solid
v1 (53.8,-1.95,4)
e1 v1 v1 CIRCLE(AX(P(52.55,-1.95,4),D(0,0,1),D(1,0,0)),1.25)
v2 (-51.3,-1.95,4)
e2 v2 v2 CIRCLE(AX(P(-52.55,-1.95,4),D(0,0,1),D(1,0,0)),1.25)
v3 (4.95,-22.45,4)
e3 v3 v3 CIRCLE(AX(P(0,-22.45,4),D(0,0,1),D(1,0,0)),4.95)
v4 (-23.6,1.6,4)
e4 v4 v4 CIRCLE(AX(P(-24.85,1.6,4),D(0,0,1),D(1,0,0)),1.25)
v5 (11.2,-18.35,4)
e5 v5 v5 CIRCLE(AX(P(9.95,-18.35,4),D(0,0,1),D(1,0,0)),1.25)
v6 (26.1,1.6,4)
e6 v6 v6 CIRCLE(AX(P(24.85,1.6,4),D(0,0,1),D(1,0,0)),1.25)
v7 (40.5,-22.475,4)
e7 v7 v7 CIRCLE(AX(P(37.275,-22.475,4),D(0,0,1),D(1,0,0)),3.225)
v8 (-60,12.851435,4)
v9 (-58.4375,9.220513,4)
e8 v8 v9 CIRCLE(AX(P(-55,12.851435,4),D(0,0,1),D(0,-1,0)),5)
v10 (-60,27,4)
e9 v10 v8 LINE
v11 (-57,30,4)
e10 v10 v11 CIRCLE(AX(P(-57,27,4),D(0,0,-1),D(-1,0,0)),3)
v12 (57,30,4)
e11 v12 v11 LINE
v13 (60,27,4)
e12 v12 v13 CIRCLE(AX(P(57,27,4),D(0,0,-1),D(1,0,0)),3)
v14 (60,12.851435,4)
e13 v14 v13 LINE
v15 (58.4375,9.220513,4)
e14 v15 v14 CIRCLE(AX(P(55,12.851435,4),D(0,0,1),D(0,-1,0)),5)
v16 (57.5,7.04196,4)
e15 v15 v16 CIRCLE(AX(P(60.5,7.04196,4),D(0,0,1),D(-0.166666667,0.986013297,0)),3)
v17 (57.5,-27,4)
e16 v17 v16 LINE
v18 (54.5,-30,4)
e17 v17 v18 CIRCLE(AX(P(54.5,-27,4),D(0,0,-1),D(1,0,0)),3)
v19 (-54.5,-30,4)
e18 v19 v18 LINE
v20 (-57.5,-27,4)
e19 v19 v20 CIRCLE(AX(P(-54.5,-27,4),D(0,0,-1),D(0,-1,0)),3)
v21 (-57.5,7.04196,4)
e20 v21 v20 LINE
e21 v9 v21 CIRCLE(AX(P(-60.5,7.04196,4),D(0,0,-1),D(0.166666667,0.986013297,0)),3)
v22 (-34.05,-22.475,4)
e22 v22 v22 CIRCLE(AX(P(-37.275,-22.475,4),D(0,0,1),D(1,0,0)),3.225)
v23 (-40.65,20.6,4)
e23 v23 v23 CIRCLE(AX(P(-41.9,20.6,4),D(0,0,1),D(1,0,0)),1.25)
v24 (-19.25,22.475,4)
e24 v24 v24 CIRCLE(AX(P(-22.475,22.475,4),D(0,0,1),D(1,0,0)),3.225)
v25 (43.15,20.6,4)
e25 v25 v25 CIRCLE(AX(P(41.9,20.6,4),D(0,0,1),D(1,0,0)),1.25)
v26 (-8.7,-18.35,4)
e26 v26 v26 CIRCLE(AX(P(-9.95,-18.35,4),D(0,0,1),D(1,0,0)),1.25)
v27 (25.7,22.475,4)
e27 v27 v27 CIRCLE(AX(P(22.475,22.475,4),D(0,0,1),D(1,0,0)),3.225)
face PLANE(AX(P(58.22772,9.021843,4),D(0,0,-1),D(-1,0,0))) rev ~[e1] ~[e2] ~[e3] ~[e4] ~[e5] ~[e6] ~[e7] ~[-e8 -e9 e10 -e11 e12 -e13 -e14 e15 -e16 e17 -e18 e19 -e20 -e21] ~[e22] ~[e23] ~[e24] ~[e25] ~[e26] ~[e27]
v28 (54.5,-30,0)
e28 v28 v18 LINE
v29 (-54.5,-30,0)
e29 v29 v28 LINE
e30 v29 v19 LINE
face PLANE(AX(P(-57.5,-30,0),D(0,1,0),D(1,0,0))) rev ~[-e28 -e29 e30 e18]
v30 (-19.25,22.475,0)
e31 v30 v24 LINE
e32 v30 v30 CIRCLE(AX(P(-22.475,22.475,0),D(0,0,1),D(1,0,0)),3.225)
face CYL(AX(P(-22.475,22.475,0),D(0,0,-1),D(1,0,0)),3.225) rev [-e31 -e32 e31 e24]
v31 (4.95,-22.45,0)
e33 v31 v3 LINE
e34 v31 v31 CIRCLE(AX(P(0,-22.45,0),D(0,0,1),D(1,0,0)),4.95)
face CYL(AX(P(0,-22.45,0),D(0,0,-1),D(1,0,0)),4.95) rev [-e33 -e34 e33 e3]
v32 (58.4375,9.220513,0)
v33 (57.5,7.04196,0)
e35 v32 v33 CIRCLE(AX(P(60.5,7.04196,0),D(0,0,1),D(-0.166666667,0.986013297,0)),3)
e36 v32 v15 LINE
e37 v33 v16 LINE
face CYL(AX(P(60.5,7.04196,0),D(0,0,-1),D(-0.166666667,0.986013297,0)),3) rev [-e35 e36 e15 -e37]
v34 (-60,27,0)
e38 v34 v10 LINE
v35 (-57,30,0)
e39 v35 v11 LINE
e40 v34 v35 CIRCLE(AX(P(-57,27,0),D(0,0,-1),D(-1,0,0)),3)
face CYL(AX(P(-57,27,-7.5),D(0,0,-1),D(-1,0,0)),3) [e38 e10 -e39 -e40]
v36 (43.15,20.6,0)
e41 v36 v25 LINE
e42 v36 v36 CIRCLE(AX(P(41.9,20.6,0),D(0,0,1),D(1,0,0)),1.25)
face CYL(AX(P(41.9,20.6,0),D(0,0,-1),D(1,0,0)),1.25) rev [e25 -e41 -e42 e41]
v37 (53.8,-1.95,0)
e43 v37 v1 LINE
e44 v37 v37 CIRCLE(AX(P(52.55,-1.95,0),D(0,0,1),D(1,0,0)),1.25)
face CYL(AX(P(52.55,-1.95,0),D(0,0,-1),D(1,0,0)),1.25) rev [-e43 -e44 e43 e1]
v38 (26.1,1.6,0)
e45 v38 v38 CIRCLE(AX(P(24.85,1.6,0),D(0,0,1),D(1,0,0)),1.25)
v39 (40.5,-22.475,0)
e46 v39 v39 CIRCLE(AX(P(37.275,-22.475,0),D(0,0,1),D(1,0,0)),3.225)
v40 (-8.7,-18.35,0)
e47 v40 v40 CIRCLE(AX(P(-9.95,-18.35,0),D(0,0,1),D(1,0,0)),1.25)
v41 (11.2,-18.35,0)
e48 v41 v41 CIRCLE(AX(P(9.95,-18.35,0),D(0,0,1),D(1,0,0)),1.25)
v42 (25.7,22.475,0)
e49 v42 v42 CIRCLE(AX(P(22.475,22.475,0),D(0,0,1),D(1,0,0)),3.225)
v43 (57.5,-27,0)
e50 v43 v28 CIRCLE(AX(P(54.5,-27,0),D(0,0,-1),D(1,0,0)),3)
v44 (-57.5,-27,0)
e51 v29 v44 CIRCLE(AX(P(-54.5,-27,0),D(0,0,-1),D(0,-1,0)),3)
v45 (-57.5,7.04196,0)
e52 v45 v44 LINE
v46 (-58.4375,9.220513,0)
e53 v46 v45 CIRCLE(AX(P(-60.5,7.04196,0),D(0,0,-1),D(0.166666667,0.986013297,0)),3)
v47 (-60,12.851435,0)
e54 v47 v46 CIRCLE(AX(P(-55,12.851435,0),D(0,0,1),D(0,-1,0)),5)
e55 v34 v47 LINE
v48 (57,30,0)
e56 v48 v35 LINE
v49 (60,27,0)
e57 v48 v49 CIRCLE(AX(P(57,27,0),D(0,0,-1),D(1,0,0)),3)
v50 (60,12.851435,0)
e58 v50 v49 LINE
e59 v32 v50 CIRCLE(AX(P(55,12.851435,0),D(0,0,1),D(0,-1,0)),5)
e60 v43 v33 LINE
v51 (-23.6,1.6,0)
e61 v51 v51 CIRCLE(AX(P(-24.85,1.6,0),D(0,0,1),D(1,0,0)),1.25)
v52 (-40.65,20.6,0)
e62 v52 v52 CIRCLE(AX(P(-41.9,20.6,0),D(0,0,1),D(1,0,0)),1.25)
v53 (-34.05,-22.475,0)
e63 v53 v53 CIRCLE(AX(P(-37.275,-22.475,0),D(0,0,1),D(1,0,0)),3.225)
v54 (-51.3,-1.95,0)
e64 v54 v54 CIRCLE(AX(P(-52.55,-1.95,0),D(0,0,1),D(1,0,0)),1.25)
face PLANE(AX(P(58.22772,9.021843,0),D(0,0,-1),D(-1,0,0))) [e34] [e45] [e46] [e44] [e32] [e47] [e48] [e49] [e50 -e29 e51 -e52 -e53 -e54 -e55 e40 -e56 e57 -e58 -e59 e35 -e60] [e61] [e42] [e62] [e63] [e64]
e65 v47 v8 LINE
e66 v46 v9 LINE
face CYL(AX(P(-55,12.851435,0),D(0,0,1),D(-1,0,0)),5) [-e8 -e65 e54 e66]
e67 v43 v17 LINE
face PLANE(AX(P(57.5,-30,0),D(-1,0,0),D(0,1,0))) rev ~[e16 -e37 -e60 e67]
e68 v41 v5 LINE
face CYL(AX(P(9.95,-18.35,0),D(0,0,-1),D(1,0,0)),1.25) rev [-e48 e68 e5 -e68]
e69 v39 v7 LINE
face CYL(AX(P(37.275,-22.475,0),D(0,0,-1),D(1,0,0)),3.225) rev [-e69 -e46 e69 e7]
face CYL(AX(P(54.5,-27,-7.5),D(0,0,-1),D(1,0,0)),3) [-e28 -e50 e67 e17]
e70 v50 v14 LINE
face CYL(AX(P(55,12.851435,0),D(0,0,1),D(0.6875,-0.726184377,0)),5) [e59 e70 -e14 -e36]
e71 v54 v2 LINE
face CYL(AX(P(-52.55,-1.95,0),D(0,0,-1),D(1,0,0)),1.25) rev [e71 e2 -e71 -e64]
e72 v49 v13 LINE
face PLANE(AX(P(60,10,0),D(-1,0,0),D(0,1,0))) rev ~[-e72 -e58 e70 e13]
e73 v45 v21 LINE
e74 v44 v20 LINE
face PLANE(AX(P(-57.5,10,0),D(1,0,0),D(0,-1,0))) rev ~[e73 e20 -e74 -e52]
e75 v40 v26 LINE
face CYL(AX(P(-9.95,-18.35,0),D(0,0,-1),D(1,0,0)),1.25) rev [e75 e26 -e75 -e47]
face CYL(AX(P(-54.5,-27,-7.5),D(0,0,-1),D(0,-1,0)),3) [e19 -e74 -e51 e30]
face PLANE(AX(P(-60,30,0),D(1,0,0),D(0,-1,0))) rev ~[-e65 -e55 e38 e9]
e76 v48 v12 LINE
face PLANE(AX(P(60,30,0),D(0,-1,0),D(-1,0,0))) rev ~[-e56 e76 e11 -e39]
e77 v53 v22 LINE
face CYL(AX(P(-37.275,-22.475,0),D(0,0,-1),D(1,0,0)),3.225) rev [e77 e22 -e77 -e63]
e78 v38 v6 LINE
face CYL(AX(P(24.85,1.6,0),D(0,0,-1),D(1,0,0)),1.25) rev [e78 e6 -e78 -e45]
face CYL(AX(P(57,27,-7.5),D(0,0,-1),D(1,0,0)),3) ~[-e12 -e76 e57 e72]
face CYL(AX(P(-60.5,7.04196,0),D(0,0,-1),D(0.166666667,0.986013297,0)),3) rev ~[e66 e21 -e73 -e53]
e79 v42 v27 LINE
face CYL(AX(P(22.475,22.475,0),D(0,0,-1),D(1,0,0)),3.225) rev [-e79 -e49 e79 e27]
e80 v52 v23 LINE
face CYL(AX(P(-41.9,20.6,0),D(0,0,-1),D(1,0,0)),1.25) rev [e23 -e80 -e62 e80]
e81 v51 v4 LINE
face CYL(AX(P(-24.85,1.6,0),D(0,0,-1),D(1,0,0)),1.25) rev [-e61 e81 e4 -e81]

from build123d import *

# Parameters (mm, degrees)
F0_R         = 3.225
F0_R_2       = 1.25
F0_R_3       = 4.95
F1_DEPTH     = 4
F2_T1_DEPTH  = 4
F2_T3_DEPTH  = 4
F2_T5_DEPTH  = 19
F2_T7_DEPTH  = 19
F2_T9_DEPTH  = 19
F2_T11_DEPTH = 19
F3_R         = 5


# Not quite as in the source:
# - a fillet or chamfer that OpenCascade refuses, or shapes differently, is made with other operations: its cross-section is extruded or revolved along the edge and cut away or added


with BuildPart() as f1:
    # F0 (on Top) → F1 (new body)
    with BuildSketch(Plane.XY):
        Polygon((60, 10), (60, 30), (-60, 30), (-60, 10), (-57.5, 10), (-57.5, -30), (57.5, -30), (57.5, 10), align=None)
        with Locations((-37.275, -22.475)):
            Circle(F0_R, mode=Mode.SUBTRACT)
        with Locations((-9.95, -18.35)):
            Circle(F0_R_2, mode=Mode.SUBTRACT)
        with Locations((-52.55, -1.95)):
            Circle(F0_R_2, mode=Mode.SUBTRACT)
        with Locations((0, -22.45)):
            Circle(F0_R_3, mode=Mode.SUBTRACT)
        with Locations((9.95, -18.35)):
            Circle(F0_R_2, mode=Mode.SUBTRACT)
        with Locations((37.275, -22.475)):
            Circle(F0_R, mode=Mode.SUBTRACT)
        with Locations((52.55, -1.95)):
            Circle(F0_R_2, mode=Mode.SUBTRACT)
        with Locations((-24.85, 1.6)):
            Circle(F0_R_2, mode=Mode.SUBTRACT)
        with Locations((-41.9, 20.6)):
            Circle(F0_R_2, mode=Mode.SUBTRACT)
        with Locations((-22.475, 22.475)):
            Circle(F0_R, mode=Mode.SUBTRACT)
        with Locations((24.85, 1.6)):
            Circle(F0_R_2, mode=Mode.SUBTRACT)
        with Locations((22.475, 22.475)):
            Circle(F0_R, mode=Mode.SUBTRACT)
        with Locations((41.9, 20.6)):
            Circle(F0_R_2, mode=Mode.SUBTRACT)
    extrude(amount=F1_DEPTH)

    # F2: fillet of radius 3 on 6 edges, made by hand

    # F2_s2 → F2_t1 (join)
    with BuildSketch(Plane.XY):
        with BuildLine():
            ThreePointArc((-60, 10), (-58.2087121525, 8.9784517816), (-57.5, 7.0419601084))
            Line((-57.5, 7.0419601084), (-57.5, 10))
            Line((-57.5, 10), (-60, 10))
        make_face()
    extrude(amount=F2_T1_DEPTH)

    # F2_s4 → F2_t3 (join)
    with BuildSketch(Plane.XY):
        with BuildLine():
            ThreePointArc((60, 10), (58.2087121525, 8.9784517816), (57.5, 7.0419601084))
            Line((57.5, 7.0419601084), (57.5, 10))
            Line((57.5, 10), (60, 10))
        make_face()
    extrude(amount=F2_T3_DEPTH)

    # F2_s6 → F2_t5 (cut)
    with BuildSketch(Plane.XY.offset(-7.5)):
        with BuildLine():
            ThreePointArc((60, 27), (59.1213203436, 29.1213203436), (57, 30))
            Line((57, 30), (60, 30))
            Line((60, 30), (60, 27))
        make_face()
    extrude(amount=F2_T5_DEPTH, mode=Mode.SUBTRACT)

    # F2_s8 → F2_t7 (cut)
    with BuildSketch(Plane.XY.offset(-7.5)):
        with BuildLine():
            ThreePointArc((-60, 27), (-59.1213203436, 29.1213203436), (-57, 30))
            Line((-57, 30), (-60, 30))
            Line((-60, 30), (-60, 27))
        make_face()
    extrude(amount=F2_T7_DEPTH, mode=Mode.SUBTRACT)

    # F2_s10 → F2_t9 (cut)
    with BuildSketch(Plane.XY.offset(-7.5)):
        with BuildLine():
            ThreePointArc((-54.5, -30), (-56.6213203436, -29.1213203436), (-57.5, -27))
            Line((-57.5, -27), (-57.5, -30))
            Line((-57.5, -30), (-54.5, -30))
        make_face()
    extrude(amount=F2_T9_DEPTH, mode=Mode.SUBTRACT)

    # F2_s12 → F2_t11 (cut)
    with BuildSketch(Plane.XY.offset(-7.5)):
        with BuildLine():
            ThreePointArc((57.5, -27), (56.6213203436, -29.1213203436), (54.5, -30))
            Line((54.5, -30), (57.5, -30))
            Line((57.5, -30), (57.5, -27))
        make_face()
    extrude(amount=F2_T11_DEPTH, mode=Mode.SUBTRACT)

    # F3
    f3_edges = [f1.edges().sort_by_distance(p)[0] for p in [
        (-60, 10, 2),
        (60, 10, 2),
    ]]
    fillet(f3_edges, radius=F3_R)


solid = f1.part
